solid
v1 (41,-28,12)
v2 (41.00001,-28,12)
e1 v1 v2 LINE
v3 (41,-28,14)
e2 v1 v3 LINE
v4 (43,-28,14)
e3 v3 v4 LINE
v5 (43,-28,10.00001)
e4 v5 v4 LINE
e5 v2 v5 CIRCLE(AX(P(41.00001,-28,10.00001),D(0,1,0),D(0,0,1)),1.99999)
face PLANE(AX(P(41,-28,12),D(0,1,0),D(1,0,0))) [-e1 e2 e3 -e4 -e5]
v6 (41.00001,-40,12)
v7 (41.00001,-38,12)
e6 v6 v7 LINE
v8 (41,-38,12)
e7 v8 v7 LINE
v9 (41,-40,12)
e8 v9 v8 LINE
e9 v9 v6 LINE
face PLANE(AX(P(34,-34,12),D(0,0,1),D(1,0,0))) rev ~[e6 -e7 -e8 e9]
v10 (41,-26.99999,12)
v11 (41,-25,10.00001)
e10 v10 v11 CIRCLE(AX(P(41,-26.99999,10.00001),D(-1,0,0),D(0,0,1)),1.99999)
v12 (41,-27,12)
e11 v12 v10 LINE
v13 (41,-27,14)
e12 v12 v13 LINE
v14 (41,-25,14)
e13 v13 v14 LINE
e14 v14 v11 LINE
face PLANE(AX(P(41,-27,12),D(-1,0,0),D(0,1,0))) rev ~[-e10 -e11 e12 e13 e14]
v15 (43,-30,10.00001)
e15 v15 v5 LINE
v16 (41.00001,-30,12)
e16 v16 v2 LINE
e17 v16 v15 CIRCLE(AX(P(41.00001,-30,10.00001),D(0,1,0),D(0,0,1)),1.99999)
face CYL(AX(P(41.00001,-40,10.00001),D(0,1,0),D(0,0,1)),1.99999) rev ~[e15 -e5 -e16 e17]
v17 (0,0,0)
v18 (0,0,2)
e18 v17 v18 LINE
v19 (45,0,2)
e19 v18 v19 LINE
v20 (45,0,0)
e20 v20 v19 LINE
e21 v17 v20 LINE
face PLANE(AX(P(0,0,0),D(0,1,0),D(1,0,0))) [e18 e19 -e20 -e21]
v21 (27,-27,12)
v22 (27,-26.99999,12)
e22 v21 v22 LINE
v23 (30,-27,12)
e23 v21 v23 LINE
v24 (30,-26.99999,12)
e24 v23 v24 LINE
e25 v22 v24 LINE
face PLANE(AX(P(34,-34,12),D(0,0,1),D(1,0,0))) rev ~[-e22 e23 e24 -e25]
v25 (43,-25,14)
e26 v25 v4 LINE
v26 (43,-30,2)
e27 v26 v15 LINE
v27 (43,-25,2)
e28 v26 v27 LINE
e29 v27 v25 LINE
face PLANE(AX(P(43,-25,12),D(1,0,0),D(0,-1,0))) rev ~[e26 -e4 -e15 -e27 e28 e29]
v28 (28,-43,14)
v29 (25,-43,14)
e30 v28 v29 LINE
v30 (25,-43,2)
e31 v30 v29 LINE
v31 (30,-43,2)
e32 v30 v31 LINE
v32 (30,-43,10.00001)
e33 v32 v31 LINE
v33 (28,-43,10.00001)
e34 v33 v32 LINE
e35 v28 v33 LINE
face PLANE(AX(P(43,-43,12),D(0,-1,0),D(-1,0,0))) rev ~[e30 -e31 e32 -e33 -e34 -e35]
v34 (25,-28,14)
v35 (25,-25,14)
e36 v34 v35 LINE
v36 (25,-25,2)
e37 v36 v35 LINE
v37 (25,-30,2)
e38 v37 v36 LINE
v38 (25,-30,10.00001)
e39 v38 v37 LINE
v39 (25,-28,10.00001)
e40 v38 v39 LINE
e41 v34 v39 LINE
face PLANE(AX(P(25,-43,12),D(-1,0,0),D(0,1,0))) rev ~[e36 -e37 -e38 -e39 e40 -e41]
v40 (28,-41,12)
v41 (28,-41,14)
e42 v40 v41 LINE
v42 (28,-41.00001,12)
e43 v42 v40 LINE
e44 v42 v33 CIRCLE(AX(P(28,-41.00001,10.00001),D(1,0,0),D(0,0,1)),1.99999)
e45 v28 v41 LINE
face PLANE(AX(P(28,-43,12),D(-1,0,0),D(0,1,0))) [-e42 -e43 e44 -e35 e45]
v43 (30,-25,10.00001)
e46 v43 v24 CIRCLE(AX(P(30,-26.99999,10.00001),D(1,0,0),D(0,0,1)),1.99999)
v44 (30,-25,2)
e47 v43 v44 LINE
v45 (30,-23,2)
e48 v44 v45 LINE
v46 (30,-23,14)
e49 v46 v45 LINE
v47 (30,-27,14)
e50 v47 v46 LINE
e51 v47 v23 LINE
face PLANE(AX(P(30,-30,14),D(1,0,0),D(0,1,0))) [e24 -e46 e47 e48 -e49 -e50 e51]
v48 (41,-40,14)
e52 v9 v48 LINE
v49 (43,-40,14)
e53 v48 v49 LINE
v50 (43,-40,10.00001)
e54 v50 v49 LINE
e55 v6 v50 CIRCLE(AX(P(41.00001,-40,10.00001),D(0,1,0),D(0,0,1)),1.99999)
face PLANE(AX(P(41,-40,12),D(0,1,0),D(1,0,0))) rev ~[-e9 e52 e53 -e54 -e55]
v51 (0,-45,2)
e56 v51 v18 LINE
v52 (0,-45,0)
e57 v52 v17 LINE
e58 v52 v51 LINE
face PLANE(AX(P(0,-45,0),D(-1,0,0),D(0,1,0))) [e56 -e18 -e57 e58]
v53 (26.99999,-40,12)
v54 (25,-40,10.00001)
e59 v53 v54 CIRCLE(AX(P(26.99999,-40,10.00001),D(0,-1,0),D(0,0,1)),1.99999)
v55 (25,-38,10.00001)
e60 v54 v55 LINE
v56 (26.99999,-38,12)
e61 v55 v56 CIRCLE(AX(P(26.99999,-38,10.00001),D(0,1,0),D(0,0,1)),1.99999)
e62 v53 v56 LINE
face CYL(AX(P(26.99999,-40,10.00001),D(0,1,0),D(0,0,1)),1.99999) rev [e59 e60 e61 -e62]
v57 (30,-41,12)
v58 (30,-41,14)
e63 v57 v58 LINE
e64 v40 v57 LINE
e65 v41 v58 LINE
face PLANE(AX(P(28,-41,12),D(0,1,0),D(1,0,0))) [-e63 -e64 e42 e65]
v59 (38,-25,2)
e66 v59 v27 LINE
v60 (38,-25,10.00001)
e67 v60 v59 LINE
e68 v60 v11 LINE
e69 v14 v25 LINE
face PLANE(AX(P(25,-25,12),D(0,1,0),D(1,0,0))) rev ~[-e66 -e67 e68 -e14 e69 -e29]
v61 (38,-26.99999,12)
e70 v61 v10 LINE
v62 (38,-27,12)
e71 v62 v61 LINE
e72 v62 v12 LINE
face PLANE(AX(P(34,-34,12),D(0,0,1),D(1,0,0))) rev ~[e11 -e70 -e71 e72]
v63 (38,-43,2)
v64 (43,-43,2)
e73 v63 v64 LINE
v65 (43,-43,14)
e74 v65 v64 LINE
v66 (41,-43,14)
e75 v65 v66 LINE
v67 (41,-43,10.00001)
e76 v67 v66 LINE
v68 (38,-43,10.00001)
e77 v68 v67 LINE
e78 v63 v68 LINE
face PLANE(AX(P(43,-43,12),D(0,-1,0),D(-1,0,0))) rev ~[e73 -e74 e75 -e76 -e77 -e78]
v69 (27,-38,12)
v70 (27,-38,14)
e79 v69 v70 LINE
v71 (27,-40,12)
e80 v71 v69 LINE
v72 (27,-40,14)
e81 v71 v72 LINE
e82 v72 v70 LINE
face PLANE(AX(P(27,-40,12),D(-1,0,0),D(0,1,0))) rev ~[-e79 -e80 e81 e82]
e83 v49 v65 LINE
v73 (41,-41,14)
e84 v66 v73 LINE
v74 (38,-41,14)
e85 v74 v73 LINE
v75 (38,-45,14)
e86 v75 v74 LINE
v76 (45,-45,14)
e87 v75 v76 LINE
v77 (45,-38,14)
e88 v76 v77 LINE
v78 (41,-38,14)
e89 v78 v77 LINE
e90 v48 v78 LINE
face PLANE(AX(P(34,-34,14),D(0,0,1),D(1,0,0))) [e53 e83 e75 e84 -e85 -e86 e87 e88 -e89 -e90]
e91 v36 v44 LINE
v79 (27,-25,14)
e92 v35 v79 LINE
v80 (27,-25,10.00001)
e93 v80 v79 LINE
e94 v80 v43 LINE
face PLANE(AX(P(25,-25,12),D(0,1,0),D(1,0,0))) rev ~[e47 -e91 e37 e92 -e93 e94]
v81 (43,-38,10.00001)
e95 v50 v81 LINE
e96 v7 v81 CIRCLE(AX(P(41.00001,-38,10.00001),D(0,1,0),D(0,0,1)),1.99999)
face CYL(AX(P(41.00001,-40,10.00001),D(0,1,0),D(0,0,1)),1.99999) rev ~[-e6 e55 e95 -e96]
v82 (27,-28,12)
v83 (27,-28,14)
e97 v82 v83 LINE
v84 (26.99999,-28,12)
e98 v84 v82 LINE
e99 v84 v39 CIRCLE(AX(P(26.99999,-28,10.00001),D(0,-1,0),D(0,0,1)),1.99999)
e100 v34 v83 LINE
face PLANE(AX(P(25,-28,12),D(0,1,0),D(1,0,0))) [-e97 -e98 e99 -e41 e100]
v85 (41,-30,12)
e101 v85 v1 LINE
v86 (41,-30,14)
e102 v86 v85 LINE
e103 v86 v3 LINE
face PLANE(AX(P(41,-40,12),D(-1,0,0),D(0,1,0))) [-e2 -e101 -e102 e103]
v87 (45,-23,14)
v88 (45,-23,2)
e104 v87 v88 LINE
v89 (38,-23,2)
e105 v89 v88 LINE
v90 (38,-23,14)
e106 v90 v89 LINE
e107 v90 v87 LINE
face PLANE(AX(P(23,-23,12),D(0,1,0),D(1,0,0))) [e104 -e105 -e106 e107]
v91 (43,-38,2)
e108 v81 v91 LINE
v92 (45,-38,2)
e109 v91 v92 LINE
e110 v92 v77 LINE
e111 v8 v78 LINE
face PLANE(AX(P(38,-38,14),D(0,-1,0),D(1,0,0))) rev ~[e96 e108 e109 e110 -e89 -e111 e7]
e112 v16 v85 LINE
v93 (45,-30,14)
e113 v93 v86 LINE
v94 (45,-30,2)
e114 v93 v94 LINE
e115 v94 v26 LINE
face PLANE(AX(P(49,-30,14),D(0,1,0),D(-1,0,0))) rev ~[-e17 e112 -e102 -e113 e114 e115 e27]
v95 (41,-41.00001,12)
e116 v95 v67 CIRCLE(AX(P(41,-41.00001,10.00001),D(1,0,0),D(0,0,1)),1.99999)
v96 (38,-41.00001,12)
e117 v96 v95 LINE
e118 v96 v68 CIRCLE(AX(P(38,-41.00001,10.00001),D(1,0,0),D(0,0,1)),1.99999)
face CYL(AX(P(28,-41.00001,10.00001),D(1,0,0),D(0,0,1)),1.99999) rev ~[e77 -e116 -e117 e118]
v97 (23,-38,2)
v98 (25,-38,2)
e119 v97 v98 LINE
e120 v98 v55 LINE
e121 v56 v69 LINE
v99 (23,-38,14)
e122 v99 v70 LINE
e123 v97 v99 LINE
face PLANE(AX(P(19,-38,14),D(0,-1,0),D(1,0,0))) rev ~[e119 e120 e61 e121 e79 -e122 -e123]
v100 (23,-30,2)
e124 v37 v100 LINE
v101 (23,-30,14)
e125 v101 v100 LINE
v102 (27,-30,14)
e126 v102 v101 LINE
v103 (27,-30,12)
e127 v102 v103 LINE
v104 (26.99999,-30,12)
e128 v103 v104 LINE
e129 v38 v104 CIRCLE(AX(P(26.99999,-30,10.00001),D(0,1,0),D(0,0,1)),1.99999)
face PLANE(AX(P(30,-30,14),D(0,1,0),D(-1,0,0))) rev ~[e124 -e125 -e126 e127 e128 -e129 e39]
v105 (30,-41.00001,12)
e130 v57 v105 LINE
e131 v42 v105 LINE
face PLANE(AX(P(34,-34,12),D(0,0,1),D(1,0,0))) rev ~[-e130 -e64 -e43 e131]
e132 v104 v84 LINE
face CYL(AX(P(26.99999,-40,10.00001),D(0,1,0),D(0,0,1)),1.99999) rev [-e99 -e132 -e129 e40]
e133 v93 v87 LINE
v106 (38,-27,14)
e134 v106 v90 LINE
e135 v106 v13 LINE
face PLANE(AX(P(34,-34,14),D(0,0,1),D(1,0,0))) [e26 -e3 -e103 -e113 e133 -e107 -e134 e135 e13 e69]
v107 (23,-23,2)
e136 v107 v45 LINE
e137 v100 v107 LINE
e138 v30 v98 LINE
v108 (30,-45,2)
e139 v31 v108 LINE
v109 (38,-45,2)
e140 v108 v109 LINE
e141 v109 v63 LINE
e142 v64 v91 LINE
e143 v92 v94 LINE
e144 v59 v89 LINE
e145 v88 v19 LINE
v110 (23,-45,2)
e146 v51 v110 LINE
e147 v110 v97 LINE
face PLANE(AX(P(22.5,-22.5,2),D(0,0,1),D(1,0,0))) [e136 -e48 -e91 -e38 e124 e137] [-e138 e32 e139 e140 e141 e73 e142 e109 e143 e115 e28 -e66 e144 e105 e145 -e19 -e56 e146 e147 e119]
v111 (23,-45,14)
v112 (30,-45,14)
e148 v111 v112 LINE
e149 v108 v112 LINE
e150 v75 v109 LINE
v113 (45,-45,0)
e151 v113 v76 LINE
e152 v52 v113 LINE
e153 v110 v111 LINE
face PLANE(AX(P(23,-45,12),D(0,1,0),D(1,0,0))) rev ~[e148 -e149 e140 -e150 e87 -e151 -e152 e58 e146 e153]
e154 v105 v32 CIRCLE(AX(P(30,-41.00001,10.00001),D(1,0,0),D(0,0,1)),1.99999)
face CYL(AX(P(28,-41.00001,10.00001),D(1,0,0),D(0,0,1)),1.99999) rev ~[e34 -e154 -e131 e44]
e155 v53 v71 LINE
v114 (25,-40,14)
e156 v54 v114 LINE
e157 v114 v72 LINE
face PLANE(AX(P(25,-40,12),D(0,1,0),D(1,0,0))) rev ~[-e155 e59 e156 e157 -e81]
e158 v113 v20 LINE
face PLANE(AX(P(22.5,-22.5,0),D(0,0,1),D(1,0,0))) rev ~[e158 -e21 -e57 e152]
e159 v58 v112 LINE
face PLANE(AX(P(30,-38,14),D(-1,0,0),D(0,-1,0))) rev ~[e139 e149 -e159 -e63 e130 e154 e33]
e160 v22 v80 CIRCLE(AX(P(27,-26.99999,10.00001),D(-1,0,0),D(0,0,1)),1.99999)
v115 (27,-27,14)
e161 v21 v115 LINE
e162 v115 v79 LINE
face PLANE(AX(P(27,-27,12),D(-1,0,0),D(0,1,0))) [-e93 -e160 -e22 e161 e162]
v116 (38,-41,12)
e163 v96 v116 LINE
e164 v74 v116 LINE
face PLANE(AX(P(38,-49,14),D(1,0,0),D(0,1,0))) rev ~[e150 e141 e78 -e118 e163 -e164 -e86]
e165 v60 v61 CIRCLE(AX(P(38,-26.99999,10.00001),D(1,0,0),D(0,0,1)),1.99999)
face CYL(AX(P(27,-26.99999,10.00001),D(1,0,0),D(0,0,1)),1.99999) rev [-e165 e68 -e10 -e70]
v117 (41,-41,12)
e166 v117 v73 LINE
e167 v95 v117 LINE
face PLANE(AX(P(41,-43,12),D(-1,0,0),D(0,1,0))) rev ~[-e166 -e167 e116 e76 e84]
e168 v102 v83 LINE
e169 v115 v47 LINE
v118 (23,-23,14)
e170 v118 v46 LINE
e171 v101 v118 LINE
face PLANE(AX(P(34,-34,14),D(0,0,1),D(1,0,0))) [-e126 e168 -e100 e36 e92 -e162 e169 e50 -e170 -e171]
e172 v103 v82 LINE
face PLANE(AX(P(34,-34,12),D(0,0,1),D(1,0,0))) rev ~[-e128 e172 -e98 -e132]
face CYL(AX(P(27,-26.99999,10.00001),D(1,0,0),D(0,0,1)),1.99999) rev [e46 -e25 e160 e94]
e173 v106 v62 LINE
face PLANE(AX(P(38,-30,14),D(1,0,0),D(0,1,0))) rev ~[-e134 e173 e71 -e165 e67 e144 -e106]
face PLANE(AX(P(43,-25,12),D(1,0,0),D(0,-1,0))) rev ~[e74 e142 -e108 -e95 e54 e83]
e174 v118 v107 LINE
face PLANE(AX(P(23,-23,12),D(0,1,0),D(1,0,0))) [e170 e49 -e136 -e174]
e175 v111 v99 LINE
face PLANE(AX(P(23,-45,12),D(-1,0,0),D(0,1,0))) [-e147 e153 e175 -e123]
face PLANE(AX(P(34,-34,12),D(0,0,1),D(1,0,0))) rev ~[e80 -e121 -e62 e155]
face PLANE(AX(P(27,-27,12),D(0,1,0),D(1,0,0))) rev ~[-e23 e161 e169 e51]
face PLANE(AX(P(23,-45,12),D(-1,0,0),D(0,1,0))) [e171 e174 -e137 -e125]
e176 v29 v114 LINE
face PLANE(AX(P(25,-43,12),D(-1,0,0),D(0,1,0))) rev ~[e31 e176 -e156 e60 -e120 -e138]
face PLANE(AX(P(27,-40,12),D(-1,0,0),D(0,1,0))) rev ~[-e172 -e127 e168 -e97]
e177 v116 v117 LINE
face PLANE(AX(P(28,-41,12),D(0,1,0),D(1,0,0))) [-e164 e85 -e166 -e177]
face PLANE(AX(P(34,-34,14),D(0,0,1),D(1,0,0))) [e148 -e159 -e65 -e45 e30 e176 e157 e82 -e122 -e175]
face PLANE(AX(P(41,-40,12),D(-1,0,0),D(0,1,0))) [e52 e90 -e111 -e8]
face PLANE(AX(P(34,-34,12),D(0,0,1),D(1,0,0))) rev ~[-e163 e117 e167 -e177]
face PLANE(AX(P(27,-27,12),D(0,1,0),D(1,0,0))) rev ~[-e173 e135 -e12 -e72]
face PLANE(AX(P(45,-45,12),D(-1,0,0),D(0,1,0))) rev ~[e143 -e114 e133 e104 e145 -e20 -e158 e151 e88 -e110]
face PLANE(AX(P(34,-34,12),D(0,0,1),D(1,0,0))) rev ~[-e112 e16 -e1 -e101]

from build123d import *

# Parameters (mm, degrees)
F0_W     = 45
F0_H     = 45
F1_DEPTH = 2
F2_W     = 22
F2_H     = 22
F2_W_2   = 18
F2_H_2   = 18
F3_DEPTH = 10
F4_W     = 22
F4_H     = 22
F4_W_2   = 2
F4_H_2   = 12
F4_W_3   = 14
F4_H_3   = 2
F4_W_4   = 13
F5_DEPTH = 2
F6_R     = 1.99999
F7_W     = 11
F7_H     = 8
F7_W_2   = 8
F7_H_2   = 11
F8_DEPTH = 12


# Not quite as in the source:
# - a fillet or chamfer is up to 0.001 mm smaller than in the source, because OpenCascade refuses the exact size


with BuildPart() as f1:
    # F0 (on Top) → F1 (new body)
    with BuildSketch(Plane.XY):
        with Locations((22.5, -22.5)):
            Rectangle(F0_W, F0_H)
    extrude(amount=F1_DEPTH)

    # F2 (on face) → F3 (join)
    with BuildSketch(Plane.XY.offset(2)):
        with Locations((34, -34)):
            Rectangle(F2_W, F2_H)
        with Locations((34, -34)):
            Rectangle(F2_W_2, F2_H_2, mode=Mode.SUBTRACT)
    extrude(amount=F3_DEPTH)

    # F4 (on face) → F5 (join)
    with BuildSketch(Plane.XY.offset(12)):
        with Locations((34, -34)):
            Rectangle(F4_W, F4_H)
        Polygon((28, -43), (25, -43), (25, -40), (25, -28), (25, -25), (27, -25), (41, -25), (43, -25), (43, -28), (43, -40), (43, -43), (41, -43), align=None, mode=Mode.SUBTRACT)
        with Locations((26, -34)):
            Rectangle(F4_W_2, F4_H_2)
        with Locations((34, -26)):
            Rectangle(F4_W_3, F4_H_3)
        with Locations((42, -34)):
            Rectangle(F4_W_2, F4_H_2)
        with Locations((34.5, -42)):
            Rectangle(F4_W_4, F4_H_3)
    extrude(amount=F5_DEPTH)

    # F6 (radius 2 in the source; OpenCascade refuses exactly that, so slightly less here)
    f6_edges = [f1.edges().sort_by_distance(p)[0] for p in [
        (25, -34, 12),
        (43, -34, 12),
        (34, -25, 12),
        (34.5, -43, 12),
    ]]
    fillet(f6_edges, radius=F6_R)

    # F7 (on face) → F8 (cut, through all)
    with BuildSketch(Plane.XY.offset(14)):
        with Locations((43.5, -34)):
            Rectangle(F7_W, F7_H)
        with Locations((34, -43.5)):
            Rectangle(F7_W_2, F7_H_2)
        with Locations((34, -34)):
            Rectangle(F7_W_2, F7_H)
        with Locations((24.5, -34)):
            Rectangle(F7_W, F7_H)
        with Locations((34, -24.5)):
            Rectangle(F7_W_2, F7_H_2)
    extrude(amount=-F8_DEPTH, mode=Mode.SUBTRACT)


solid = f1.part
